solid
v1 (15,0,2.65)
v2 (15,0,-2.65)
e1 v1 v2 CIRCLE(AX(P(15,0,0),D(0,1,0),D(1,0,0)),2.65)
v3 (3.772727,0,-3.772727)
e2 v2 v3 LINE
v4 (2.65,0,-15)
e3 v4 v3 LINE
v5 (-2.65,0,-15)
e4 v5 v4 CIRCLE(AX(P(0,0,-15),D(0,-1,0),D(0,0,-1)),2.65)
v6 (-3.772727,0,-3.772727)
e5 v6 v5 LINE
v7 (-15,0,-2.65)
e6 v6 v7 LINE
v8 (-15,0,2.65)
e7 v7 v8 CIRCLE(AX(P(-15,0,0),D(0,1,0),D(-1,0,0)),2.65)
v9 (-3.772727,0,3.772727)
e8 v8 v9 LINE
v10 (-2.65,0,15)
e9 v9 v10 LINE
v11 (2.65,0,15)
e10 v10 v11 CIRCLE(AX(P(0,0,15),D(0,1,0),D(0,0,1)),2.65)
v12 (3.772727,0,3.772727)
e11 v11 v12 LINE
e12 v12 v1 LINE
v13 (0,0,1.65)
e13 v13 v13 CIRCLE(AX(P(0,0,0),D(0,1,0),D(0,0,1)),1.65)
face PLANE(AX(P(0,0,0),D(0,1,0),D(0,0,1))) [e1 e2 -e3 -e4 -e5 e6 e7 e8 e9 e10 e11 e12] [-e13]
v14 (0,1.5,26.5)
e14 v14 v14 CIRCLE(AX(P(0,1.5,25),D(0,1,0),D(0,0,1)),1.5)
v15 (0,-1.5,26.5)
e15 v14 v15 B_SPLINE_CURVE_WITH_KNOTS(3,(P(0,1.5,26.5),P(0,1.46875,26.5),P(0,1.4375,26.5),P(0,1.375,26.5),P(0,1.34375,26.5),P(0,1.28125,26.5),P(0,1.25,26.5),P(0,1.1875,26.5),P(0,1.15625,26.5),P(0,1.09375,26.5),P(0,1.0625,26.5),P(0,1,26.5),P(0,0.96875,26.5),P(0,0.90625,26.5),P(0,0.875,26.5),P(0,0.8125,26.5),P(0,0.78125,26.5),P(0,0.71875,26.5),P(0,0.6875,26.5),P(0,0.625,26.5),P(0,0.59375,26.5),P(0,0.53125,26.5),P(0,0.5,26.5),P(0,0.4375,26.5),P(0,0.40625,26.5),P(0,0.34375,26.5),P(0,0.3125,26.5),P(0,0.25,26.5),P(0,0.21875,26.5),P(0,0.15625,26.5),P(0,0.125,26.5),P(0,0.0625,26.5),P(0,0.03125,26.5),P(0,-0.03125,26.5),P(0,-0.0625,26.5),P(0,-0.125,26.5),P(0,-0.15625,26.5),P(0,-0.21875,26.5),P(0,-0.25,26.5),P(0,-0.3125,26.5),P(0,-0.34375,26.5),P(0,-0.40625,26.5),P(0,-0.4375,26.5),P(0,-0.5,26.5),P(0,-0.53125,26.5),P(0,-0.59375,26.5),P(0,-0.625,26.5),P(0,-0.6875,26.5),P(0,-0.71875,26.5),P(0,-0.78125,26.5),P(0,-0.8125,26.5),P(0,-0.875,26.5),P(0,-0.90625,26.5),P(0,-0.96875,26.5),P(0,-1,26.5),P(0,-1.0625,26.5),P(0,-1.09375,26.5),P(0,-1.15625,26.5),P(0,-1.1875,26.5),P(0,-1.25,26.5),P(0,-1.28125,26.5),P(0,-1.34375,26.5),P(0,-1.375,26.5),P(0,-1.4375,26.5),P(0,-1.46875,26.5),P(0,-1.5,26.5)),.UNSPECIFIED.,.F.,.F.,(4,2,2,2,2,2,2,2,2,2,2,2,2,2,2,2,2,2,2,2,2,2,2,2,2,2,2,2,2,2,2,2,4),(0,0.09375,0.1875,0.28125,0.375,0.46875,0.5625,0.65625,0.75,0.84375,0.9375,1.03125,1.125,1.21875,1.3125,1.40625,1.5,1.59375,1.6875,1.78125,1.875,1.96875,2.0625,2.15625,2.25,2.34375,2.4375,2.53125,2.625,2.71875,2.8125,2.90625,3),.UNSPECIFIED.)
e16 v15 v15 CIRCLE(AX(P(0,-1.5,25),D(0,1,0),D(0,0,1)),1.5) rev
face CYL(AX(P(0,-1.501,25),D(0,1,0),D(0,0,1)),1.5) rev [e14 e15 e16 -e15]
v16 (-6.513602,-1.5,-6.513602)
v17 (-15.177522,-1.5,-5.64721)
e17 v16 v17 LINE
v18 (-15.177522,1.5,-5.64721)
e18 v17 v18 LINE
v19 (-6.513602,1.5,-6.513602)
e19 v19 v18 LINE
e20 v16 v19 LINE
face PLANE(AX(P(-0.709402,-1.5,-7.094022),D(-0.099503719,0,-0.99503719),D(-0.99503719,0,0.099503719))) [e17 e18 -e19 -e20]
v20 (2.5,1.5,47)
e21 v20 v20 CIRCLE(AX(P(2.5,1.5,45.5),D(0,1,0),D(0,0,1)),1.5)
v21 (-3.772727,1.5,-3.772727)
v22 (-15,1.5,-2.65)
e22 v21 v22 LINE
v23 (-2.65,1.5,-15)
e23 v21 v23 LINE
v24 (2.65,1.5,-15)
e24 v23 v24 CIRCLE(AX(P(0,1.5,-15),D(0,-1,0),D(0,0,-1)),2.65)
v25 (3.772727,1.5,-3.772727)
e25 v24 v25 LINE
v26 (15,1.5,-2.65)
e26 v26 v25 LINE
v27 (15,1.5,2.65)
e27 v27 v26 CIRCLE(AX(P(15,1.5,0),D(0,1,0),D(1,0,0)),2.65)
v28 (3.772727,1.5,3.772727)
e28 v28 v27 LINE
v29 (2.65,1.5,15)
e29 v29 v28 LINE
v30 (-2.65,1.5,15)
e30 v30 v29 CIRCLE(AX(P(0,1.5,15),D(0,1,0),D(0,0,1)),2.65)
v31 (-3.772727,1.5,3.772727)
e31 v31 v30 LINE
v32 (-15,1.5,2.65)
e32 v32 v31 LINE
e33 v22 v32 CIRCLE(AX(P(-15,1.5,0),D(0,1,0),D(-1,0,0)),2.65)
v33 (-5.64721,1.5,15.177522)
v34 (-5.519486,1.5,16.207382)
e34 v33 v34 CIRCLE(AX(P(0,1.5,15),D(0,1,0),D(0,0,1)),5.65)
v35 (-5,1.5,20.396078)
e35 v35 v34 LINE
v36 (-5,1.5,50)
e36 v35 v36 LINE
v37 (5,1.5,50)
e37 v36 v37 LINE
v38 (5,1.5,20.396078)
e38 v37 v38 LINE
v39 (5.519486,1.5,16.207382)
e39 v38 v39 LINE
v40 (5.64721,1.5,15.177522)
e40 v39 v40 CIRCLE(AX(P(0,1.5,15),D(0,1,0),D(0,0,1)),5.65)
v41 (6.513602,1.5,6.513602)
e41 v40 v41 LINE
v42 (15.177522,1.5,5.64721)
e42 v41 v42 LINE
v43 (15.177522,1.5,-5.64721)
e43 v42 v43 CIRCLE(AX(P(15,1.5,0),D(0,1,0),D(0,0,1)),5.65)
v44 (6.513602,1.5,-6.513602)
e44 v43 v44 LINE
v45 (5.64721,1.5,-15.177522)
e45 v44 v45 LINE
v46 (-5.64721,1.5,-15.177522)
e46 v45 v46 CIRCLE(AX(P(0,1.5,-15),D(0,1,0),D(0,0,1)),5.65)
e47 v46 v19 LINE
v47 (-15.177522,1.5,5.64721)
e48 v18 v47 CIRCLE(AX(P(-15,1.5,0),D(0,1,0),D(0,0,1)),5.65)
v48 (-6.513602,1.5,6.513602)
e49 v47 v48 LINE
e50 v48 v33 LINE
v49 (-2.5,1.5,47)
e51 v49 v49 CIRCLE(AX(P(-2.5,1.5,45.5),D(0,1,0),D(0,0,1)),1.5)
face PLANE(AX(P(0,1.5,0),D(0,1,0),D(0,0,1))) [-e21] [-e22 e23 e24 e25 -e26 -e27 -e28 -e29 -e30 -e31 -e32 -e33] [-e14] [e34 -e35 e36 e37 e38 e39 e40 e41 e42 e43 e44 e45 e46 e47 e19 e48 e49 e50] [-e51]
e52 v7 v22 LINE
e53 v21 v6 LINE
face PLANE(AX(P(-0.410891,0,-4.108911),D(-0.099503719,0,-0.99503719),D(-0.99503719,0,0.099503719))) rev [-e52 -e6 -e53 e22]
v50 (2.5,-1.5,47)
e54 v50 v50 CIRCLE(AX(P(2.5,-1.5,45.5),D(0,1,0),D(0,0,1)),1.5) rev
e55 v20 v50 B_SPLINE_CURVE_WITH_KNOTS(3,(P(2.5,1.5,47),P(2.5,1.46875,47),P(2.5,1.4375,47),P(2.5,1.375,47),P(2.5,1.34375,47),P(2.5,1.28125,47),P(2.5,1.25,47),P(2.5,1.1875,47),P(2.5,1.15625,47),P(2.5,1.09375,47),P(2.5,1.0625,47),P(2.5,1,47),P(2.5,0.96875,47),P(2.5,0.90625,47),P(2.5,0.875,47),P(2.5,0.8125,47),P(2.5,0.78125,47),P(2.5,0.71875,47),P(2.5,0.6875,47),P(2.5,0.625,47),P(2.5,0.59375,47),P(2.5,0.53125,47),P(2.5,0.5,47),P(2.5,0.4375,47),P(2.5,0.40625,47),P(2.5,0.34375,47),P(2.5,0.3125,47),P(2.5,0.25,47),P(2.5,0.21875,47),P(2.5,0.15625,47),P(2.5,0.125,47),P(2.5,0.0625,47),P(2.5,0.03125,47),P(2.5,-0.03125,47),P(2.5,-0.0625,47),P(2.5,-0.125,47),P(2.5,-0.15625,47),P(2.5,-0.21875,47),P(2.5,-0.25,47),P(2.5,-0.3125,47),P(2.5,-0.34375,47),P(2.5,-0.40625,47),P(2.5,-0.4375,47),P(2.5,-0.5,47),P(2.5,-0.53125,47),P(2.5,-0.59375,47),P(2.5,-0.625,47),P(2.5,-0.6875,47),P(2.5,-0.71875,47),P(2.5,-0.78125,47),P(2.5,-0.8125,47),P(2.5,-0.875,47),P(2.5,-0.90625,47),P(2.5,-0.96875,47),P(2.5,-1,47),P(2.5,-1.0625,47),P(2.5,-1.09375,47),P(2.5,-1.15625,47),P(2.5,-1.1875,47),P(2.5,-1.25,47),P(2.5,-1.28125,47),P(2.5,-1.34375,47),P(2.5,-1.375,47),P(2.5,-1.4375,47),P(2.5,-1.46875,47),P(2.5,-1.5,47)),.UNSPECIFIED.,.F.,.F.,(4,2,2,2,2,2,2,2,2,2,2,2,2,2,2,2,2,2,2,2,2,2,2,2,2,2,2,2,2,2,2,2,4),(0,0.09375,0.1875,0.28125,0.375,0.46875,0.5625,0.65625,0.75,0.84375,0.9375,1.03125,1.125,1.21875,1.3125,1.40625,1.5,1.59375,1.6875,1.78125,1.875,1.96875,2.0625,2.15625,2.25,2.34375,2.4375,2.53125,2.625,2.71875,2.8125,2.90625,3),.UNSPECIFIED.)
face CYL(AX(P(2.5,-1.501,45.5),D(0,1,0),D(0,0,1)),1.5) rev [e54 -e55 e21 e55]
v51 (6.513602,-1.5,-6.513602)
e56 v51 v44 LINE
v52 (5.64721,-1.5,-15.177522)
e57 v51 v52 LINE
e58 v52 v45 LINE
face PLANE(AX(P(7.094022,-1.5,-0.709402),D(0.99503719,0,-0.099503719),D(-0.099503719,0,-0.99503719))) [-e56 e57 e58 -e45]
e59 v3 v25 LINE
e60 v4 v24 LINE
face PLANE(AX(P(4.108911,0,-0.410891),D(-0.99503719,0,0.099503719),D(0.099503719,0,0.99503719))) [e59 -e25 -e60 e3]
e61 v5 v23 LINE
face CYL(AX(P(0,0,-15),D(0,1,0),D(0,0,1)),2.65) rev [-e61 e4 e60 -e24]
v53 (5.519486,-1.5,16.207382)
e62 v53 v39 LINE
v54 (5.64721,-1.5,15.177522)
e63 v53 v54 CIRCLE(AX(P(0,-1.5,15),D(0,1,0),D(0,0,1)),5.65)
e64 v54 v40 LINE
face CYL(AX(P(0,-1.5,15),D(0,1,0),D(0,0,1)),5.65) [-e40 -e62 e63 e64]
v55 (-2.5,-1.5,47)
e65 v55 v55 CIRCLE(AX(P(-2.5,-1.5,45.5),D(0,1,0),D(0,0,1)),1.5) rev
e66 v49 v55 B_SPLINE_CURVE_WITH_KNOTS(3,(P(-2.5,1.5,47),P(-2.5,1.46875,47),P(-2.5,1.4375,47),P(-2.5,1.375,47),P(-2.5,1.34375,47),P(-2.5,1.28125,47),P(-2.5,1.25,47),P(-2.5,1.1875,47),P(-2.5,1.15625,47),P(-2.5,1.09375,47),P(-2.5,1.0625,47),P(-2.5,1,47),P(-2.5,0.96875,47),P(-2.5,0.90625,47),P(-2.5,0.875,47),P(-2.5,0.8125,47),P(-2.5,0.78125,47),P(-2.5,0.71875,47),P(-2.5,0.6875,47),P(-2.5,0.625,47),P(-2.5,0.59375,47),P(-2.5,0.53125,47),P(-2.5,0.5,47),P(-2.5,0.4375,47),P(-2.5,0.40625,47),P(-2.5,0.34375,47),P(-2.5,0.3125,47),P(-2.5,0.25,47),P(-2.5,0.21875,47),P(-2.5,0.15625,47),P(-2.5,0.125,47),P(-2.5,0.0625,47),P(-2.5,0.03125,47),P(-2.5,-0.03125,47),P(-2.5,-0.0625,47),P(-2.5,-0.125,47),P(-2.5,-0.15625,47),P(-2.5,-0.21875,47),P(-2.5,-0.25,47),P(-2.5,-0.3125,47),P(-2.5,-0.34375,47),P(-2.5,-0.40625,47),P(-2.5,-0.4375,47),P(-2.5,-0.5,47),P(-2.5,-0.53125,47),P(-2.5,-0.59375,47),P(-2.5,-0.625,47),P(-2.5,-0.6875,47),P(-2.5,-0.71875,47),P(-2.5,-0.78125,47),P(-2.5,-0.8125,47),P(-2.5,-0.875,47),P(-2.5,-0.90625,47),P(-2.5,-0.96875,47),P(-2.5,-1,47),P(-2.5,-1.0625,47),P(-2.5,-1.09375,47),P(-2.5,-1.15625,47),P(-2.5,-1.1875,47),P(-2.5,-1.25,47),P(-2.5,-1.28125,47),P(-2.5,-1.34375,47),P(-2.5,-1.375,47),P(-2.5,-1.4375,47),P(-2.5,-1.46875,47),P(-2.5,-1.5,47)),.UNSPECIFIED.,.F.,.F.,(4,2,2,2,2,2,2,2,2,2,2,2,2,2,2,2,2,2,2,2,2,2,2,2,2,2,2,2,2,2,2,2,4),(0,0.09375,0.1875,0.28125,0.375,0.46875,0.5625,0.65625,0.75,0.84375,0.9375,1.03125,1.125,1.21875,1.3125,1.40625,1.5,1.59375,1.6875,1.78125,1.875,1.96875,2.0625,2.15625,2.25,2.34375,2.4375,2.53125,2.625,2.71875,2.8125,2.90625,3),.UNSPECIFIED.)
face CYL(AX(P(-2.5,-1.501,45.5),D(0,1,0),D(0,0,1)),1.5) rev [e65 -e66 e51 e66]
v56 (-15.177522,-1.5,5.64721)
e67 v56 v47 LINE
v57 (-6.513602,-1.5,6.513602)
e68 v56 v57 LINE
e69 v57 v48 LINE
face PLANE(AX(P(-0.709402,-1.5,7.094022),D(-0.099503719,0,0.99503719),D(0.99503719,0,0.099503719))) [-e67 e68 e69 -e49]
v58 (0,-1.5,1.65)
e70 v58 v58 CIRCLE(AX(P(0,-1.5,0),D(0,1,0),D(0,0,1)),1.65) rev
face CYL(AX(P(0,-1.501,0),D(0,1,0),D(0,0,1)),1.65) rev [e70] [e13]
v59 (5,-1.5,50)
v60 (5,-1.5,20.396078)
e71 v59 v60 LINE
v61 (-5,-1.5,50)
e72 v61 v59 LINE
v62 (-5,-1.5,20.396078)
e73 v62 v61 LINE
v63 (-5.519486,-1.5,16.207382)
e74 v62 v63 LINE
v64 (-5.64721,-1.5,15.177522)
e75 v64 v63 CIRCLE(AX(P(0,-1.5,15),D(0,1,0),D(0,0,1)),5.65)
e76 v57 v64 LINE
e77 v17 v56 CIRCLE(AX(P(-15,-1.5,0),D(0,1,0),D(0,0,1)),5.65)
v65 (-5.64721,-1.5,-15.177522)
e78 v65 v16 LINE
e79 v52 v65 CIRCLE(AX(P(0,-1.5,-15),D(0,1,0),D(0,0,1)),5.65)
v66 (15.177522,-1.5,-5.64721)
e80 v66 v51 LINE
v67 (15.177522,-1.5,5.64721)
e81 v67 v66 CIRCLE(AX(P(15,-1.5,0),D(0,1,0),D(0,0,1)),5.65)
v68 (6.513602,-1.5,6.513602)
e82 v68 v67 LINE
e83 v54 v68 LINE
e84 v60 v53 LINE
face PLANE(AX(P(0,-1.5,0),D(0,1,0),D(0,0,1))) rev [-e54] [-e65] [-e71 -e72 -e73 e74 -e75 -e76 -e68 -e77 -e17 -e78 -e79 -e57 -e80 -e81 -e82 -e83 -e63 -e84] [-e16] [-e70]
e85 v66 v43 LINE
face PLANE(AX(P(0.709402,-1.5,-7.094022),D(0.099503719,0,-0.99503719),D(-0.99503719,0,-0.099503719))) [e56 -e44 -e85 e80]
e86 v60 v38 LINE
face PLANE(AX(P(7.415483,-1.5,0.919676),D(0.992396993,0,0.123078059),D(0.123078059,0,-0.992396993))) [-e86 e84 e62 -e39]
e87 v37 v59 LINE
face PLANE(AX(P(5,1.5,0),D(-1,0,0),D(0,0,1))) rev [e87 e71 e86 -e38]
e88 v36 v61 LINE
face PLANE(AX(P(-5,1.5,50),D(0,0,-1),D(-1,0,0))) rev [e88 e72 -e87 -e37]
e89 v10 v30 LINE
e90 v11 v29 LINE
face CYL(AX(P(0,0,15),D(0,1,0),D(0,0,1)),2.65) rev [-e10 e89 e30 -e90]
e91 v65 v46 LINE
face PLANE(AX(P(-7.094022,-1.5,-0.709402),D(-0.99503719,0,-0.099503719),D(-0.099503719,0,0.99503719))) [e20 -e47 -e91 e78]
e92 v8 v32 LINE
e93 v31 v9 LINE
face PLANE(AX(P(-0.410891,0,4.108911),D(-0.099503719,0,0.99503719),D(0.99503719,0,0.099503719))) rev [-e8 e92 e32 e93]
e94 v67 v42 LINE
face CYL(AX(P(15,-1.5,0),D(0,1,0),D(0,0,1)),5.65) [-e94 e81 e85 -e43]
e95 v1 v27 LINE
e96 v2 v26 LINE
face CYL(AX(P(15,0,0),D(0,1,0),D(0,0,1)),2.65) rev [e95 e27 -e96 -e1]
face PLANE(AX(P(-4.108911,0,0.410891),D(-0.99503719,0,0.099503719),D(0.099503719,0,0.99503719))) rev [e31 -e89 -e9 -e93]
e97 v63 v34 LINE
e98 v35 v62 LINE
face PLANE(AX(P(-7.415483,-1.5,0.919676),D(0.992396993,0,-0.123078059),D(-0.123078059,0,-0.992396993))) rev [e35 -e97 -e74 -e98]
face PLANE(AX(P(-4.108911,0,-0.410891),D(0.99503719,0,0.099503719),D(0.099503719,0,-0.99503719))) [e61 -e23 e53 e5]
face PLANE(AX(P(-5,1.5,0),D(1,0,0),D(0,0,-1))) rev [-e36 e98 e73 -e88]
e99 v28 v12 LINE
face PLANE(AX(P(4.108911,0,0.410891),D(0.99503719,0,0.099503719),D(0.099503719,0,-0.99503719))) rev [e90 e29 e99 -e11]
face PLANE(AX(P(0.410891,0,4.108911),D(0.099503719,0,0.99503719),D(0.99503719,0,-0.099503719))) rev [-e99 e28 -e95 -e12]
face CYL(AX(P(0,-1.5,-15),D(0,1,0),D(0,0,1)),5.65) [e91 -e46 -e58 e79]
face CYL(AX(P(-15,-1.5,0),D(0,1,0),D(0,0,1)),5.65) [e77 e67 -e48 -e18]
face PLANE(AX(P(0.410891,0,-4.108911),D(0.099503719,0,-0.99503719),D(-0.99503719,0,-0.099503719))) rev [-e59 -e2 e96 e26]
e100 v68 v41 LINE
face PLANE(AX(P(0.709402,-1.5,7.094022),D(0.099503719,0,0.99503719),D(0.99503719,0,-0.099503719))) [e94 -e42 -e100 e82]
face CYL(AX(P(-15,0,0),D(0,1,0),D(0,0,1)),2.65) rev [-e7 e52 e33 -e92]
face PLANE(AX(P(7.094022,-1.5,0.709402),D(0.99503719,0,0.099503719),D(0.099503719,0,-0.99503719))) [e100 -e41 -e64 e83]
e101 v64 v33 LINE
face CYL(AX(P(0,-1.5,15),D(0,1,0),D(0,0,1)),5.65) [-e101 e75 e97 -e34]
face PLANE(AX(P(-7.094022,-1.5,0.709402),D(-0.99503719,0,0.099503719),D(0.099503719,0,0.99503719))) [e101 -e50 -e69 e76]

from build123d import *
from build123d.topology import SkipClean

# Parameters (mm, degrees)
SKETCH1_R               = 21
BOSS_EXTRUDE1_DEPTH     = 1.5
SKETCH2_R               = 2.65
CUT_EXTRUDE1_DEPTH      = 1.5
SKETCH5_W               = 10
SKETCH5_H               = 50
BOSS_EXTRUDE2_DEPTH     = 1.5
CIRPATTERN1_DEPTH       = 1.5
CUT_EXTRUDE4_REACH      = 56.252
SKETCH4_R               = 1.65
CUT_EXTRUDE5_REACH      = 56.314
SKETCH6_R               = 1.5
CUT_EXTRUDE6_DEPTH      = 55.251728083
CUT_EXTRUDE6_DEPTH_BACK = 55.251728083
CUT_EXTRUDE8_REACH      = 56.18
SKETCH9_R               = 1.5


# Read off the part's stored shape, not the designer's step: CirPattern1
with BuildPart() as part:
    # Sketch1 → Boss-Extrude1 (new, symmetric)
    with BuildSketch(Plane(origin=(0, 0, 0), x_dir=(1, 0, 0), z_dir=(0, 1, 0))):
        with Locations(Location((0, 0, 0), (0, 0, 270))):
            Circle(SKETCH1_R)
    extrude(amount=BOSS_EXTRUDE1_DEPTH, both=True)

    # Sketch2 → Cut-Extrude1 (cut)
    with BuildSketch(Plane(origin=(0, 1.5, 0), x_dir=(1, 0, 0), z_dir=(0, 1, 0))):
        with Locations((0, -15)):
            Circle(SKETCH2_R)
        with BuildLine():
            ThreePointArc((-2.65, -15), (0, -12.35), (2.65, -15))
            Line((2.65, -15), (4.067821782, -0.821782178))
            ThreePointArc((4.067821782, -0.821782178), (0, -4.15), (-4.067821782, -0.821782178))
            Line((-4.067821782, -0.821782178), (-2.65, -15))
        make_face()
        with BuildLine():
            ThreePointArc((-4.067821782, -0.821782178), (0, -4.15), (4.067821782, -0.821782178))
            Line((4.067821782, -0.821782178), (4.15, 0))
            ThreePointArc((4.15, 0), (0, 4.15), (-4.15, 0))
            Line((-4.15, 0), (-4.067821782, -0.821782178))
        make_face()
    cut_extrude1 = extrude(amount=-CUT_EXTRUDE1_DEPTH, mode=Mode.SUBTRACT)

    # Sketch5 → Boss-Extrude2 (add, symmetric)
    with BuildSketch(Plane(origin=(0, 0, 0), x_dir=(1, 0, 0), z_dir=(0, 1, 0))):
        with Locations((0, -25)):
            Rectangle(SKETCH5_W, SKETCH5_H)
    extrude(amount=BOSS_EXTRUDE2_DEPTH, both=True)

    # Mirror1: Cut-Extrude1 across plane
    with SkipClean():  # the faces are left unmerged after this step: merging them gives an invalid solid
        add(cut_extrude1.mirror(Plane.XY), mode=Mode.SUBTRACT)

    # CirPattern1 outline → CirPattern1 (cut)
    with BuildSketch(Plane(origin=(0, 0, 0), x_dir=(1, 0, 0), z_dir=(0, 1, 0))):
        with BuildLine():
            Line((3.772727273, -3.772727273), (15, -2.65))
            ThreePointArc((15, -2.65), (17.65, 0), (15, 2.65))
            Line((15, 2.65), (3.772727273, 3.772727273))
            Line((3.772727273, 3.772727273), (4.067821782, 0.821782178))
            ThreePointArc((4.067821782, 0.821782178), (0, -4.15), (-4.067821782, 0.821782178))
            Line((-4.067821782, 0.821782178), (-3.772727273, 3.772727273))
            Line((-3.772727273, 3.772727273), (-15, 2.65))
            ThreePointArc((-15, 2.65), (-17.65, 0), (-15, -2.65))
            Line((-15, -2.65), (-3.772727273, -3.772727273))
            Line((-3.772727273, -3.772727273), (-2.65, -15))
            ThreePointArc((-2.65, -15), (0, -17.65), (2.65, -15))
            Line((2.65, -15), (3.772727273, -3.772727273))
        make_face()
    extrude(amount=CIRPATTERN1_DEPTH, mode=Mode.SUBTRACT)

    # Sketch4 → Cut-Extrude4 (cut, up to next)
    with BuildSketch(Plane(origin=(0, 0, 0), x_dir=(1, 0, 0), z_dir=(0, 1, 0)), mode=Mode.PRIVATE) as cut_extrude4_sk1:
        with Locations(Location((0, 0, 0), (0, 0, 270))):
            Circle(SKETCH4_R)
    cut_extrude4_tool1 = extrude(cut_extrude4_sk1.sketch, amount=-CUT_EXTRUDE4_REACH, mode=Mode.PRIVATE) & part.part
    add(cut_extrude4_tool1.solids().sort_by_distance((0, 0, 0))[0], mode=Mode.SUBTRACT)

    # Sketch6 → Cut-Extrude5 (cut, up to next)
    with BuildSketch(Plane(origin=(0, 1.5, 0), x_dir=(1, 0, 0), z_dir=(0, 1, 0)), mode=Mode.PRIVATE) as cut_extrude5_sk1:
        with Locations(Location((2.5, -45.5, 0), (0, 0, 270))):
            Circle(SKETCH6_R)
    cut_extrude5_tool1 = extrude(cut_extrude5_sk1.sketch, amount=-CUT_EXTRUDE5_REACH, mode=Mode.PRIVATE) & part.part
    # Sketch6 → Cut-Extrude5 (cut, up to next)
    with BuildSketch(Plane(origin=(0, 1.5, 0), x_dir=(1, 0, 0), z_dir=(0, 1, 0)), mode=Mode.PRIVATE) as cut_extrude5_sk2:
        with Locations(Location((-2.5, -45.5, 0), (0, 0, 270))):
            Circle(SKETCH6_R)
    cut_extrude5_tool2 = extrude(cut_extrude5_sk2.sketch, amount=-CUT_EXTRUDE5_REACH, mode=Mode.PRIVATE) & part.part
    add(cut_extrude5_tool1.solids().sort_by_distance((2.5, 1.5, 45.5))[0], mode=Mode.SUBTRACT)
    add(cut_extrude5_tool2.solids().sort_by_distance((-2.5, 1.5, 45.5))[0], mode=Mode.SUBTRACT)

    # Sketch7 → Cut-Extrude6 (cut, two sides: drawn at the far end of the back side and taken through both)
    with BuildSketch(Plane(origin=(0, 0, 0), x_dir=(1, 0, 0), z_dir=(0, 1, 0)).offset(-CUT_EXTRUDE6_DEPTH_BACK)):
        with BuildLine():
            ThreePointArc((5, -20.396078054), (0, 21), (-5, -20.396078054))
            Line((-5, -20.396078054), (-5.519486194, -16.207382355))
            ThreePointArc((-5.519486194, -16.207382355), (-5.607043009, -15.695391034), (-5.647210443, -15.177522436))
            Line((-5.647210443, -15.177522436), (-6.513602442, -6.513602442))
            Line((-6.513602442, -6.513602442), (-15.177522436, -5.647210443))
            ThreePointArc((-15.177522436, -5.647210443), (-20.65, 0), (-15.177522436, 5.647210443))
            Line((-15.177522436, 5.647210443), (-6.513602442, 6.513602442))
            Line((-6.513602442, 6.513602442), (-5.647210443, 15.177522436))
            ThreePointArc((-5.647210443, 15.177522436), (0, 20.65), (5.647210443, 15.177522436))
            Line((5.647210443, 15.177522436), (6.513602442, 6.513602442))
            Line((6.513602442, 6.513602442), (15.177522436, 5.647210443))
            ThreePointArc((15.177522436, 5.647210443), (20.65, 0), (15.177522436, -5.647210443))
            Line((15.177522436, -5.647210443), (6.513602442, -6.513602442))
            Line((6.513602442, -6.513602442), (5.647210443, -15.177522436))
            ThreePointArc((5.647210443, -15.177522436), (5.607043009, -15.695391034), (5.519486194, -16.207382355))
            Line((5.519486194, -16.207382355), (5, -20.396078054))
        make_face()
    extrude(amount=CUT_EXTRUDE6_DEPTH + CUT_EXTRUDE6_DEPTH_BACK, mode=Mode.SUBTRACT)

    # Sketch9 → Cut-Extrude8 (cut, up to next)
    with BuildSketch(Plane(origin=(0, 1.5, 0), x_dir=(1, 0, 0), z_dir=(0, 1, 0)), mode=Mode.PRIVATE) as cut_extrude8_sk1:
        with Locations(Location((0, -25, 0), (0, 0, 270))):
            Circle(SKETCH9_R)
    cut_extrude8_tool1 = extrude(cut_extrude8_sk1.sketch, amount=-CUT_EXTRUDE8_REACH, mode=Mode.PRIVATE) & part.part
    add(cut_extrude8_tool1.solids().sort_by_distance((0, 1.5, 25))[0], mode=Mode.SUBTRACT)


solid = part.part
